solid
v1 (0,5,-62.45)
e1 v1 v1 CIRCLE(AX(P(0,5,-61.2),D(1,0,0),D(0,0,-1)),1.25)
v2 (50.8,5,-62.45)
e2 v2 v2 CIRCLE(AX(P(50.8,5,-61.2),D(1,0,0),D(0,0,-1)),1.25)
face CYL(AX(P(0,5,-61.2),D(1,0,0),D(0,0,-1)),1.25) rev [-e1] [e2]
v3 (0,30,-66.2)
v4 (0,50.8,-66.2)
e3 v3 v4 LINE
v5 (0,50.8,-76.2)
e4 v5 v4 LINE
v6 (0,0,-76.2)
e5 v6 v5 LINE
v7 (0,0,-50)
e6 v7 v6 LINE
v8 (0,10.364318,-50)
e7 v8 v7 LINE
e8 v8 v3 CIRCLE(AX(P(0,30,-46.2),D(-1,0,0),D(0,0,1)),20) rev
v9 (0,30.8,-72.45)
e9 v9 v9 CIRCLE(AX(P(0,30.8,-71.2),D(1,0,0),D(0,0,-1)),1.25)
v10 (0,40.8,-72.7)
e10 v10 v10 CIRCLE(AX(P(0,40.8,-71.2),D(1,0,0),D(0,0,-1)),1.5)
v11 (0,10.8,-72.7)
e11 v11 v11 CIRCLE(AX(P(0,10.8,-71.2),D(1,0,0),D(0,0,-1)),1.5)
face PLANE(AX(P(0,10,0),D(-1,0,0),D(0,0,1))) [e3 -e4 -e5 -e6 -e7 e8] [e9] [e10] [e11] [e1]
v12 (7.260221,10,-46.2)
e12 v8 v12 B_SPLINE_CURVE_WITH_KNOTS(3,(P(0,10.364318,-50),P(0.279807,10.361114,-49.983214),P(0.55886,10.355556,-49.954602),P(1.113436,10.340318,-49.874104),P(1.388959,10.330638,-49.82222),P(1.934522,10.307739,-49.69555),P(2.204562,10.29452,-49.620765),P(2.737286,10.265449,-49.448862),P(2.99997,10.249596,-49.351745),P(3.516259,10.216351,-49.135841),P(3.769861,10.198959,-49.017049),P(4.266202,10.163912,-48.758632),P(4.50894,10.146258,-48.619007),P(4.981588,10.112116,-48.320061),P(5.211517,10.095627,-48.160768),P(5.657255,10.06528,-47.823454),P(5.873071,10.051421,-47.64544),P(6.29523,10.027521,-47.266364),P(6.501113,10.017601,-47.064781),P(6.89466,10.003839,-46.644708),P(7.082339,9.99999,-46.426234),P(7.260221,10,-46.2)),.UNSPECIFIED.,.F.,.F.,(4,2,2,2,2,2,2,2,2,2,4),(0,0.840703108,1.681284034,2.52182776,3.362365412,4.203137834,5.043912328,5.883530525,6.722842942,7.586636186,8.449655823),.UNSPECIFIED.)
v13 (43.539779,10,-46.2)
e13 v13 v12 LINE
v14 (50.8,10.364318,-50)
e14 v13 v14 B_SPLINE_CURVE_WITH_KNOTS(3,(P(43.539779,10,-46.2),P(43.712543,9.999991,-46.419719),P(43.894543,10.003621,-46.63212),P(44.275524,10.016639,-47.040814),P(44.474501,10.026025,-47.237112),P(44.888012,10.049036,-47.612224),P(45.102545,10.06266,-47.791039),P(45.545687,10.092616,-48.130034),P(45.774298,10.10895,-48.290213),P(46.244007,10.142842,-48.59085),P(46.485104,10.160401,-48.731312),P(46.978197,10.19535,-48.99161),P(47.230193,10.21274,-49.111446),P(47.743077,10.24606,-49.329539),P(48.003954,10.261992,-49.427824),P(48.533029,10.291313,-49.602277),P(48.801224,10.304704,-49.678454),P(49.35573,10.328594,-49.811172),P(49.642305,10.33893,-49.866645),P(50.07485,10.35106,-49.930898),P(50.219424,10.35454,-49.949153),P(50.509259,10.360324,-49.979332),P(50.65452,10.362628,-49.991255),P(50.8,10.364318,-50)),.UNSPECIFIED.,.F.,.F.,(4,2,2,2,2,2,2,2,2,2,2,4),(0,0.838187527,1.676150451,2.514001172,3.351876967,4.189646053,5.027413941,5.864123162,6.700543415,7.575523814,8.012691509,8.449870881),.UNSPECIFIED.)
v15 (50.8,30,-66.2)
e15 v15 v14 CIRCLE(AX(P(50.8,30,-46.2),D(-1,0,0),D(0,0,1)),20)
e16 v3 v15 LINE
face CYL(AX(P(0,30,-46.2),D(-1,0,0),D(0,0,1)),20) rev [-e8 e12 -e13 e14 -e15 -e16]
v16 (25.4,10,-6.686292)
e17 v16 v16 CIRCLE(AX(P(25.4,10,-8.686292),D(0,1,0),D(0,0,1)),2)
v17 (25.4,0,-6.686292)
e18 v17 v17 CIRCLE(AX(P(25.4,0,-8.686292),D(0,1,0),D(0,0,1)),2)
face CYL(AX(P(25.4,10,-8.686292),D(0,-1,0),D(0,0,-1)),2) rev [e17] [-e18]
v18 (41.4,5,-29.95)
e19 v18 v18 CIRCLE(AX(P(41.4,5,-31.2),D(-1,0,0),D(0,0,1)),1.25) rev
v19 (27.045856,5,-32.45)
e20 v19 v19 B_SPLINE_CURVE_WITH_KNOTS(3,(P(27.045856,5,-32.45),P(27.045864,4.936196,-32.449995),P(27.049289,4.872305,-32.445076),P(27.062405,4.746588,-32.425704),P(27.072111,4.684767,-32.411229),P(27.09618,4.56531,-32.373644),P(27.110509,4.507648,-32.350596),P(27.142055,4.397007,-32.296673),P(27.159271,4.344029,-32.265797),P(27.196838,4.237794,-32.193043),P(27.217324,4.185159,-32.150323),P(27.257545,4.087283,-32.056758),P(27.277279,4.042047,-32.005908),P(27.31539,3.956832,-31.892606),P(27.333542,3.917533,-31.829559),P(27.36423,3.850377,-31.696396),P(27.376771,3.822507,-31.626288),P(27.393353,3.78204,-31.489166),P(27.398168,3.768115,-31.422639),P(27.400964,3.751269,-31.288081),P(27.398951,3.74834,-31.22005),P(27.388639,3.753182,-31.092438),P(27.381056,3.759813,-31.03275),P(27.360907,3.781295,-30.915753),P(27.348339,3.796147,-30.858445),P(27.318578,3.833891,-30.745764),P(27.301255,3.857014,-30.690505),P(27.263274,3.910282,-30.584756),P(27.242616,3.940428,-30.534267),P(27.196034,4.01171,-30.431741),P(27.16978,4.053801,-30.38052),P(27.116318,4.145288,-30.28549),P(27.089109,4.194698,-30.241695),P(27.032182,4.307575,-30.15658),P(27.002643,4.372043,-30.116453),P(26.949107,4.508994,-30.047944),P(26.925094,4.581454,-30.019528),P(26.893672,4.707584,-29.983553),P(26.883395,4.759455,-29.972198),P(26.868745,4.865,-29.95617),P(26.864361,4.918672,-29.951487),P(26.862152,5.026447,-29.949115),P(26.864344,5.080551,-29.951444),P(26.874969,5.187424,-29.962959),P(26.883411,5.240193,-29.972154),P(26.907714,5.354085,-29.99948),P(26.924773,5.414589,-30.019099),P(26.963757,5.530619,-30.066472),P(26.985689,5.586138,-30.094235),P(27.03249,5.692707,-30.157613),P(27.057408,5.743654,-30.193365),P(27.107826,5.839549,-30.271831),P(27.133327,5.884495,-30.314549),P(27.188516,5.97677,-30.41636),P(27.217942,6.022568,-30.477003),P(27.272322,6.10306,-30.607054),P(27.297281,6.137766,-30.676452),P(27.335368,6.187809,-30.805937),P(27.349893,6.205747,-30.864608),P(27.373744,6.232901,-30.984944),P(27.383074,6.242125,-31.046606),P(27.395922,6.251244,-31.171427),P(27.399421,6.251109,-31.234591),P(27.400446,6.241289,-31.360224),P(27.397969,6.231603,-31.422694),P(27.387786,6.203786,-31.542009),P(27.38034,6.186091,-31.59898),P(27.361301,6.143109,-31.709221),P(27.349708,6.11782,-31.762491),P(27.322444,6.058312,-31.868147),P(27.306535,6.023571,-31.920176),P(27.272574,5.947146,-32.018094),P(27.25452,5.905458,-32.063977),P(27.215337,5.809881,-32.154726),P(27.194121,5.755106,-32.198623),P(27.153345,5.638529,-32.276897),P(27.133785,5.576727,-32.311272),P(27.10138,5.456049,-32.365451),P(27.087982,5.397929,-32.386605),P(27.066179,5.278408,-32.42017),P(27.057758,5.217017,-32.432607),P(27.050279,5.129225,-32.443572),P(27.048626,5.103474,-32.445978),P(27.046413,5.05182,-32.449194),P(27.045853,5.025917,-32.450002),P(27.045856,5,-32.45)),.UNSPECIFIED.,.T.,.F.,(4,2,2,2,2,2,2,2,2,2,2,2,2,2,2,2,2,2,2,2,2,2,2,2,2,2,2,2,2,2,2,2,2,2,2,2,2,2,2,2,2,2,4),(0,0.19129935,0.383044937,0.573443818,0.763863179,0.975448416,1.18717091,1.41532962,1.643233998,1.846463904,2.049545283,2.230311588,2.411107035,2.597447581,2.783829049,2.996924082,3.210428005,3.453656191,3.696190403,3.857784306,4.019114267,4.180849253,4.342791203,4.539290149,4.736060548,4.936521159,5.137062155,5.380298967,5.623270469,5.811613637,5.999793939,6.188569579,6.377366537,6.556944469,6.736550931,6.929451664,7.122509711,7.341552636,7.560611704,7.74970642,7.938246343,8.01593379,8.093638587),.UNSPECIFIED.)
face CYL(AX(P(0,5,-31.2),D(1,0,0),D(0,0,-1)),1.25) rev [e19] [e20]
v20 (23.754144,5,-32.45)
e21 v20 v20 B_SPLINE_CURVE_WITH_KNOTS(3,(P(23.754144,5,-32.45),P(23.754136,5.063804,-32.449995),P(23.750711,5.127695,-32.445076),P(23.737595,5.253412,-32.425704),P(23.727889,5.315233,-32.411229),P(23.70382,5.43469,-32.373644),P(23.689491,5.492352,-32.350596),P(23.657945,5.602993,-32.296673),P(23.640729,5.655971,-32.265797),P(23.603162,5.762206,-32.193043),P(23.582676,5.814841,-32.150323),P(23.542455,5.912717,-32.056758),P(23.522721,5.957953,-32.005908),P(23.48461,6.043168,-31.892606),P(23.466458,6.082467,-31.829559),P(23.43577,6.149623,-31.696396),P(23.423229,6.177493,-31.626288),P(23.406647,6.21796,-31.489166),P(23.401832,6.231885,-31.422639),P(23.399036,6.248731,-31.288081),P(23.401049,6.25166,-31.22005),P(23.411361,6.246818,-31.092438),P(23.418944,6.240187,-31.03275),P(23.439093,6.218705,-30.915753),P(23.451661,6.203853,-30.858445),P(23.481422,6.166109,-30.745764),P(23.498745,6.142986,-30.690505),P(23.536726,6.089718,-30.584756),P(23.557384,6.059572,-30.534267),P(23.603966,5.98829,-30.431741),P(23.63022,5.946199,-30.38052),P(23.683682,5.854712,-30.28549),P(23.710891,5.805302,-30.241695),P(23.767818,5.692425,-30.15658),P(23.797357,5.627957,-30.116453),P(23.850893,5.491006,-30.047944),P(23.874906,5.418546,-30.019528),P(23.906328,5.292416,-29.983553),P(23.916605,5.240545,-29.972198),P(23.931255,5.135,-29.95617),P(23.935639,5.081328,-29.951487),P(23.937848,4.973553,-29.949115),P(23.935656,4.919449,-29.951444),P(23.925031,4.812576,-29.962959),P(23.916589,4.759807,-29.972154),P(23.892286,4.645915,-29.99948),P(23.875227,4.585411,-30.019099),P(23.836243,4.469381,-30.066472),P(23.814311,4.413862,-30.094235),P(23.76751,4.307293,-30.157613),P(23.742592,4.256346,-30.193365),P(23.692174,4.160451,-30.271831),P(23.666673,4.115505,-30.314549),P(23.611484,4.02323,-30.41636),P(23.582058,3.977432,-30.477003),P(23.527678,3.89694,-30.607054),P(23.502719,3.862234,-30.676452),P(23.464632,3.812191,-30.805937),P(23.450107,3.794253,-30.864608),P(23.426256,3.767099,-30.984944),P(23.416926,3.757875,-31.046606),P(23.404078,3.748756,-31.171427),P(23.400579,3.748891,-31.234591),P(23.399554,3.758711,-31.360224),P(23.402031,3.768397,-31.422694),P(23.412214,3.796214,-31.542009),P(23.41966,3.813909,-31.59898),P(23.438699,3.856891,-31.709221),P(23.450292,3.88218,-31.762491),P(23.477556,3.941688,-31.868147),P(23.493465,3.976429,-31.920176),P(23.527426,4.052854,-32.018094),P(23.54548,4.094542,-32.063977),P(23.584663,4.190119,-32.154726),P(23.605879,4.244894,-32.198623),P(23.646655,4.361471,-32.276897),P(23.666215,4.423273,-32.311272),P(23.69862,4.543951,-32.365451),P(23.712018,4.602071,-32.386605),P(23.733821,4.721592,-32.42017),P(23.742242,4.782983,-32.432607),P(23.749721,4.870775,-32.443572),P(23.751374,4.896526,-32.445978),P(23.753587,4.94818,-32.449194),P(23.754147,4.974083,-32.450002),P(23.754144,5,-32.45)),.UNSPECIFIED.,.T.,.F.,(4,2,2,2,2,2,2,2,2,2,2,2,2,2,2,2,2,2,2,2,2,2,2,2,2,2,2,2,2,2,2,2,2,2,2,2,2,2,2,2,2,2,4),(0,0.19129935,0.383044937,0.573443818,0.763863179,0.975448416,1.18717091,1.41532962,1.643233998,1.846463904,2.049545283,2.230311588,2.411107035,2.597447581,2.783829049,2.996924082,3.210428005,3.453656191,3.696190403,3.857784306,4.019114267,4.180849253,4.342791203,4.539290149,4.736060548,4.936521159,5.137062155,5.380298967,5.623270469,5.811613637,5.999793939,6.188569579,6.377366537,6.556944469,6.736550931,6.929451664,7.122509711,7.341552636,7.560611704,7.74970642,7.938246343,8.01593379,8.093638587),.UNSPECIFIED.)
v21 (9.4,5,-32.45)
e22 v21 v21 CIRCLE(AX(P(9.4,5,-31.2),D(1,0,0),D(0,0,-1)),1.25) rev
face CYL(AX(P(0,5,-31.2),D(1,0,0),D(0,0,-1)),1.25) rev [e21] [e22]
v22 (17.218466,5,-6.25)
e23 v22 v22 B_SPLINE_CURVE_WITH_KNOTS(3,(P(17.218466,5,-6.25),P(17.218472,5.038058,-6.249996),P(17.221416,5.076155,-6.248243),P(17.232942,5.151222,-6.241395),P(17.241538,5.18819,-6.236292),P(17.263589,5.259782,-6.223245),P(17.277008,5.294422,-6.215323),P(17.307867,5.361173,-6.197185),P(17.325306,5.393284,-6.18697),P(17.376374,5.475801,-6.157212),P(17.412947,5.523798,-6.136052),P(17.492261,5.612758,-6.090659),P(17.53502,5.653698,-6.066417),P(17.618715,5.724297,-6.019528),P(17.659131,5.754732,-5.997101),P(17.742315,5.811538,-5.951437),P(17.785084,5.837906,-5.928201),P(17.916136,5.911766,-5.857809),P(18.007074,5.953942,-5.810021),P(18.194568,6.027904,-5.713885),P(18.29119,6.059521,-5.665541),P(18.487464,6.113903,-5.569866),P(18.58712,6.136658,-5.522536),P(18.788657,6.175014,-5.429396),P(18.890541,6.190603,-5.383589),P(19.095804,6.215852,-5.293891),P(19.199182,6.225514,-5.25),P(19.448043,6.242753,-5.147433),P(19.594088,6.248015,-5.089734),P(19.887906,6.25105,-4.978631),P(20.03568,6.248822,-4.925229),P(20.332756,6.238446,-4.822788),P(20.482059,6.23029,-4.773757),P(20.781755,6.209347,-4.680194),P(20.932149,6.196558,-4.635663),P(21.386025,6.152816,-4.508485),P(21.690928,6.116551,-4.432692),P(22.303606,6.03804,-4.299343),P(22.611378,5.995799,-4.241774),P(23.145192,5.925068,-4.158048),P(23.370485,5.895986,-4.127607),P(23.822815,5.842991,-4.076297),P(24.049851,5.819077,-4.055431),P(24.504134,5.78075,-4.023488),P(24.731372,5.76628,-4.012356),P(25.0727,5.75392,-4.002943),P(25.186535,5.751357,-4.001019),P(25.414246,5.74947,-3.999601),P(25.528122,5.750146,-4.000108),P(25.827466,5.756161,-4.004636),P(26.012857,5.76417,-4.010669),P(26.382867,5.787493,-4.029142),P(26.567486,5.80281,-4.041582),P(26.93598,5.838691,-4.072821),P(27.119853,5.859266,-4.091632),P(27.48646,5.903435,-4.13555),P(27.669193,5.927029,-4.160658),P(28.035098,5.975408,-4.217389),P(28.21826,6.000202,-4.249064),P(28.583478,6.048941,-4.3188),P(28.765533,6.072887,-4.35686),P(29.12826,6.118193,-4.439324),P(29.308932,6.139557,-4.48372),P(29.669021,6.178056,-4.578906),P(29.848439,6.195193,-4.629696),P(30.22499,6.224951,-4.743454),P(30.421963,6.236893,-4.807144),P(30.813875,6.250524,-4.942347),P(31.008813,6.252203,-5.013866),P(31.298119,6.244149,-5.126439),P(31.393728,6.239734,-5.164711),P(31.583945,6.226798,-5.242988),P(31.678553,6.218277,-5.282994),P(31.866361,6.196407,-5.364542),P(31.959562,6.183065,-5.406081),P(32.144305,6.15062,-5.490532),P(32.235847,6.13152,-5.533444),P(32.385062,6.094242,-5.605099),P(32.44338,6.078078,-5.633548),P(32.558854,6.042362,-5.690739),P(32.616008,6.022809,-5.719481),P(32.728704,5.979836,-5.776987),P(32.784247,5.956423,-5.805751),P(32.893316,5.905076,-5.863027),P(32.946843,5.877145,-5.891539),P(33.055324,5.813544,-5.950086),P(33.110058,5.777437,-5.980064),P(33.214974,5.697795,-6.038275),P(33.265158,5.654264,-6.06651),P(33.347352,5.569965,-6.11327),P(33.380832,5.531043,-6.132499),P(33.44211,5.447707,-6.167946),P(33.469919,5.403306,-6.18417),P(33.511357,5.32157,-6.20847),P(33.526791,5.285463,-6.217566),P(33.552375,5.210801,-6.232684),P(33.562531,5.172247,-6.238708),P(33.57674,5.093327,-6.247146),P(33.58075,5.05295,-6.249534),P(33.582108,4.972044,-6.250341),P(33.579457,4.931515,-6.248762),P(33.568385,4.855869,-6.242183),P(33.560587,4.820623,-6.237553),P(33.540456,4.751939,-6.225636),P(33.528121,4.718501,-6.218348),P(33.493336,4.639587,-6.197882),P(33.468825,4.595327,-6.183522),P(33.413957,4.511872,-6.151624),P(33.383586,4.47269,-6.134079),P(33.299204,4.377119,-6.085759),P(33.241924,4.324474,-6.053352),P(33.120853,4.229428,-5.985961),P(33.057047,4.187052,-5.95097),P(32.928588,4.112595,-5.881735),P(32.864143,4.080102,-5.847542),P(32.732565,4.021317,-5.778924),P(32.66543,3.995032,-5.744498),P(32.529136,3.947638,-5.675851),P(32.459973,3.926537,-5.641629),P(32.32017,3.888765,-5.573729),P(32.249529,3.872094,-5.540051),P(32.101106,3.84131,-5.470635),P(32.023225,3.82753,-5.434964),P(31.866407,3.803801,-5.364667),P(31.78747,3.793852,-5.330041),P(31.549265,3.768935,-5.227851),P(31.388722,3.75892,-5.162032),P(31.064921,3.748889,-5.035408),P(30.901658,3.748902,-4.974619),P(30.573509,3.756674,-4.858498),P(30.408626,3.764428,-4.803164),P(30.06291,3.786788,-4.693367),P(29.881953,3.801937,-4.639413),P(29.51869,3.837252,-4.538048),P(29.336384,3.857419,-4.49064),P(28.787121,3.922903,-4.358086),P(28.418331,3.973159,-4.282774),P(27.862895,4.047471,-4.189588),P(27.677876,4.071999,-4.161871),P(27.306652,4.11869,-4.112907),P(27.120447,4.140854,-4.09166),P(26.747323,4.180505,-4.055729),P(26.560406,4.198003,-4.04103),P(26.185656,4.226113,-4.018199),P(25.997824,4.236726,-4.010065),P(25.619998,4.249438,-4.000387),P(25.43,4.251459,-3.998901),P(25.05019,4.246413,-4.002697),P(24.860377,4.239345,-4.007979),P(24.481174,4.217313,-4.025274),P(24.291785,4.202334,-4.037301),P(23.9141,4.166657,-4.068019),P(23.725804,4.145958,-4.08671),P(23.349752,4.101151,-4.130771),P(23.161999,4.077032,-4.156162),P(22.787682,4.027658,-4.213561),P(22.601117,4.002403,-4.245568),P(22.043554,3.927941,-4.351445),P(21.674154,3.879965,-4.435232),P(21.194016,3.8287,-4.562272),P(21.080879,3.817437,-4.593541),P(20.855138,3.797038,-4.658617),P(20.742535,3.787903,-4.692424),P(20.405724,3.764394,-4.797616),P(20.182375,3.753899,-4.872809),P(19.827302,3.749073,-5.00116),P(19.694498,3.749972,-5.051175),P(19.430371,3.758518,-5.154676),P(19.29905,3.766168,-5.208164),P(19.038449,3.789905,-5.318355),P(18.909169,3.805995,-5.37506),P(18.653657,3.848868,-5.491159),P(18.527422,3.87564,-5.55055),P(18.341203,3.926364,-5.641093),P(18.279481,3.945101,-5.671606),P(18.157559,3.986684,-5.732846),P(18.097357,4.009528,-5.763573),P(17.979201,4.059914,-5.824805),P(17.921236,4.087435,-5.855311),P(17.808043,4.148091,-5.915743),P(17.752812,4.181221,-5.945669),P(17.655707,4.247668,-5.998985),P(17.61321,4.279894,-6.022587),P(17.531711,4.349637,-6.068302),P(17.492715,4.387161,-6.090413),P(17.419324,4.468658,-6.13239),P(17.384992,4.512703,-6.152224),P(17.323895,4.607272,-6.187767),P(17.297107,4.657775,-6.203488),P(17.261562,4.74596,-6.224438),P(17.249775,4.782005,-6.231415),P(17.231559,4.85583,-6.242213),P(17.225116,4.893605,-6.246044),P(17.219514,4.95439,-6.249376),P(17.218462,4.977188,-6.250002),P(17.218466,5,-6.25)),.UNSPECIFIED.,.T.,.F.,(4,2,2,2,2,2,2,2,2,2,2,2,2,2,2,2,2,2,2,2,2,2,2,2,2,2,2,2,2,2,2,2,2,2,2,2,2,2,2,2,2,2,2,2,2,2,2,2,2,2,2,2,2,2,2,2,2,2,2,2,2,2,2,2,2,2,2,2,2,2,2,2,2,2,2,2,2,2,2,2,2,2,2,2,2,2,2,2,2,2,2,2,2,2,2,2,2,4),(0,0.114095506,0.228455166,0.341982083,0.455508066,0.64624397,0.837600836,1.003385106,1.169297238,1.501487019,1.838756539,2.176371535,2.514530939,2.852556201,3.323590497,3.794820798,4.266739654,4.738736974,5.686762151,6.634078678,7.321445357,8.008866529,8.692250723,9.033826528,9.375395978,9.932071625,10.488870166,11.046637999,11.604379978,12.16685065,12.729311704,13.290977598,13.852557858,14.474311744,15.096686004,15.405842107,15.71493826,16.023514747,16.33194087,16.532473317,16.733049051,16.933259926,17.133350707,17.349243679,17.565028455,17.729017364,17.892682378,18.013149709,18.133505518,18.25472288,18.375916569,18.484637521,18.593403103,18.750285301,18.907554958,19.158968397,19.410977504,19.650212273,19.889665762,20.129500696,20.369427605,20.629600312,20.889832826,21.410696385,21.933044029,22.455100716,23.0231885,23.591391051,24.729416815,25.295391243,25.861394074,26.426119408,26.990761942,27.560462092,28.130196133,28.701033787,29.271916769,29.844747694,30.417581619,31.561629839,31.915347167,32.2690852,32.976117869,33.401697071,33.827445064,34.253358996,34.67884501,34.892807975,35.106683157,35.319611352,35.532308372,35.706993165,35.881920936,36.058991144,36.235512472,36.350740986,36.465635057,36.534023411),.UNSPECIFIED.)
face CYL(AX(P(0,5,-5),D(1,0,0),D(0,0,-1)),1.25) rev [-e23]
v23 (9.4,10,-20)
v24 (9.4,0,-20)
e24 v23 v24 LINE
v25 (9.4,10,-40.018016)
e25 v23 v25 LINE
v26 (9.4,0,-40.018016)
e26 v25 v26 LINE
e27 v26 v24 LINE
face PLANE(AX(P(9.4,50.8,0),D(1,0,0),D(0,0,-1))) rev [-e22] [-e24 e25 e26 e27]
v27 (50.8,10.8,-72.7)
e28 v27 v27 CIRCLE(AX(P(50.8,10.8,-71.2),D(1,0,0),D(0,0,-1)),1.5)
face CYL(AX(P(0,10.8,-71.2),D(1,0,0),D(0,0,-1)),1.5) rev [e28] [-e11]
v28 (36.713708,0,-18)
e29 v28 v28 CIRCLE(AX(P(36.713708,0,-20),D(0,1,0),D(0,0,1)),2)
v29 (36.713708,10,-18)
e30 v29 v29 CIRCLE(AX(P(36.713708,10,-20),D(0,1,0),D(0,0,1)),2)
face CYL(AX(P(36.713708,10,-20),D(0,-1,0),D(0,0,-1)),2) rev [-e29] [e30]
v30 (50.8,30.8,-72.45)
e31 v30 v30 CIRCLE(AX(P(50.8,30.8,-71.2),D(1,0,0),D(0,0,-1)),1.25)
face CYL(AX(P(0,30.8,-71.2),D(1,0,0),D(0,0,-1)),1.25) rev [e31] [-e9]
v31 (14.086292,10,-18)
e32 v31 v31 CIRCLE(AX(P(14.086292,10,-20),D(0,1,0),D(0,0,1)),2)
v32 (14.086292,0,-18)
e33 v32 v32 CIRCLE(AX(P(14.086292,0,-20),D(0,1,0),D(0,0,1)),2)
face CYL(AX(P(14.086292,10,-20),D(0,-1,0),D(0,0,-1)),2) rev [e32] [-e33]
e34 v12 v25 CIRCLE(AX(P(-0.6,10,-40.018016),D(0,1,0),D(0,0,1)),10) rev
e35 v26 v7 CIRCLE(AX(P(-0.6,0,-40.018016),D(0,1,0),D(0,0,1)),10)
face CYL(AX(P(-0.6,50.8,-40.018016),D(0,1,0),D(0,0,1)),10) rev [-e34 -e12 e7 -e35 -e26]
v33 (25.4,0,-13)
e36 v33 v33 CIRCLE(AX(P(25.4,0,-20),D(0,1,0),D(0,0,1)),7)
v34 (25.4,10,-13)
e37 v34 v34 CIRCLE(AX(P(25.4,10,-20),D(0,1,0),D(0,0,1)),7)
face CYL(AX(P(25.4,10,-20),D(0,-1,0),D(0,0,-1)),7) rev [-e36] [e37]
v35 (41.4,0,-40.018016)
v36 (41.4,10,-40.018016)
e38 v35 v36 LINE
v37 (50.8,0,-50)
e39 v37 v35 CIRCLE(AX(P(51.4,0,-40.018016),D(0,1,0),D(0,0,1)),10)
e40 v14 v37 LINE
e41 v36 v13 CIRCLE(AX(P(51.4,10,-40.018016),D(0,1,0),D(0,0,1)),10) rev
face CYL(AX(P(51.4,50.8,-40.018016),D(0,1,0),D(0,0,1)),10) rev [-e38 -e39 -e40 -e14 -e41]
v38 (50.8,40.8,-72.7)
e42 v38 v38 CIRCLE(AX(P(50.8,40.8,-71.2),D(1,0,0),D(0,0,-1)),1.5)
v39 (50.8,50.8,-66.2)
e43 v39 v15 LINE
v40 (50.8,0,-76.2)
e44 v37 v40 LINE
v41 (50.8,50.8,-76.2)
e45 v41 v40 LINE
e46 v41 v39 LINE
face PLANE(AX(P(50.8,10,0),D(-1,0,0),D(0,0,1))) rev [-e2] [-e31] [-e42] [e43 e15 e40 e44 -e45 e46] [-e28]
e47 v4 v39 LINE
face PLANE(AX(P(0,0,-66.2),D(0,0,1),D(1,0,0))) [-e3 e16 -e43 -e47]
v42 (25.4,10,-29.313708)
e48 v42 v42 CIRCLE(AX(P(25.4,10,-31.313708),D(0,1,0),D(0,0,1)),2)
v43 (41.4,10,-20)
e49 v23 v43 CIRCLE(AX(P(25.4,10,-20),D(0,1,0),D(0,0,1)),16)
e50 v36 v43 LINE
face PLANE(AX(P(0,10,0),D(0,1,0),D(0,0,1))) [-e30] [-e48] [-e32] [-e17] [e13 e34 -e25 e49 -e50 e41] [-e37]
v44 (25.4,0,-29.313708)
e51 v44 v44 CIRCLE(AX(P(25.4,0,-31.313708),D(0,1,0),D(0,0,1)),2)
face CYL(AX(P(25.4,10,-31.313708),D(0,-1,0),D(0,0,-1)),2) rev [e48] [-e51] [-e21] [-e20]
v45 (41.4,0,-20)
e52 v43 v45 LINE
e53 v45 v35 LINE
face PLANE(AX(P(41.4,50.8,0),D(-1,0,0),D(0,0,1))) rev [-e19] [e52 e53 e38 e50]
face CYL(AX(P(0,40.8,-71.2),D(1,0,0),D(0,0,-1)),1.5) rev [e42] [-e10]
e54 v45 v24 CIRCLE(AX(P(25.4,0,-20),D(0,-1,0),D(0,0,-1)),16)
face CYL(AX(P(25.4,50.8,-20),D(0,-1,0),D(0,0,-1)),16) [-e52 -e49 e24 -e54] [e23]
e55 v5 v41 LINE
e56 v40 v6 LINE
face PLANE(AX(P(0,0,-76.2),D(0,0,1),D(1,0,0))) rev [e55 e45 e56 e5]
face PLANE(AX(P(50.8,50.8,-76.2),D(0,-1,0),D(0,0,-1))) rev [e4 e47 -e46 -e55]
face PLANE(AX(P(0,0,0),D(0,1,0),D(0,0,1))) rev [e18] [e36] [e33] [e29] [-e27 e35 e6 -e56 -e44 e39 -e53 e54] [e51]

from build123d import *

# Parameters (mm, degrees)
SKETCH1_W           = 50.8
SKETCH1_H           = 66.2
SKETCH1_R           = 2
SKETCH1_R_2         = 7
BOSS_EXTRUDE1_DEPTH = 10
SKETCH2_W           = 50.8
SKETCH2_H           = 50.8
BOSS_EXTRUDE2_DEPTH = 10
FILLET2_R           = 20
SKETCH3_R           = 1.25
CUT_EXTRUDE1_DEPTH  = 105.726882891
SKETCH4_R           = 1.25
SKETCH4_R_2         = 1.5
CUT_EXTRUDE2_DEPTH  = 105.726882939
CUT_EXTRUDE3_DEPTH  = 105.726882939
FILLET3_DEPTH       = 10.364318194
FILLET3_START       = -1
FILLET3_2_DEPTH     = 53


with BuildPart() as part:
    # Sketch1 → Boss-Extrude1 (new body)
    with BuildSketch(Plane(origin=(0, 0, 0), x_dir=(1, 0, 0), z_dir=(0, 1, 0))):
        with Locations((25.4, 33.1)):
            Rectangle(SKETCH1_W, SKETCH1_H)
        with Locations(Location((14.086291501, 20, 0), (0, 0, 270))):
            Circle(SKETCH1_R, mode=Mode.SUBTRACT)
        with Locations(Location((25.4, 8.686291501, 0), (0, 0, 270))):
            Circle(SKETCH1_R, mode=Mode.SUBTRACT)
        with Locations(Location((36.713708499, 20, 0), (0, 0, 270))):
            Circle(SKETCH1_R, mode=Mode.SUBTRACT)
        with Locations(Location((25.4, 31.313708499, 0), (0, 0, 270))):
            Circle(SKETCH1_R, mode=Mode.SUBTRACT)
        with Locations(Location((25.4, 20, 0), (0, 0, 270))):
            Circle(SKETCH1_R_2, mode=Mode.SUBTRACT)
    extrude(amount=BOSS_EXTRUDE1_DEPTH)

    # Sketch2 → Boss-Extrude2 (add)
    with BuildSketch(Plane(origin=(0, 0, -66.2), x_dir=(-1, 0, 0), z_dir=(0, 0, -1))):
        with Locations((-25.4, 25.4)):
            Rectangle(SKETCH2_W, SKETCH2_H)
    extrude(amount=BOSS_EXTRUDE2_DEPTH)

    # Fillet2
    fillet2_edges = [part.edges().sort_by_distance(p)[0] for p in [
        (25.4, 10, -66.2),
    ]]
    fillet(fillet2_edges, radius=FILLET2_R)

    # Sketch3 → Cut-Extrude1 (cut, through all)
    with BuildSketch(Plane(origin=(50.8, 0, 0), x_dir=(0, 0, -1), z_dir=(1, 0, 0))):
        with Locations((61.2, 5)):
            Circle(SKETCH3_R)
        with Locations((31.2, 5)):
            Circle(SKETCH3_R)
        with Locations((5, 5)):
            Circle(SKETCH3_R)
    extrude(amount=-CUT_EXTRUDE1_DEPTH, mode=Mode.SUBTRACT)

    # Sketch4 → Cut-Extrude2 (cut, through all)
    with BuildSketch(Plane(origin=(50.8, 0, 0), x_dir=(0, 0, -1), z_dir=(1, 0, 0))):
        with Locations((71.2, -9.2)):
            Circle(SKETCH4_R)
        with Locations((71.2, 30.8)):
            Circle(SKETCH4_R)
        with Locations((71.2, 10.8)):
            Circle(SKETCH4_R_2)
        with Locations((71.2, 40.8)):
            Circle(SKETCH4_R_2)
    extrude(amount=-CUT_EXTRUDE2_DEPTH, mode=Mode.SUBTRACT)

    # Sketch5 → Cut-Extrude3 (cut, through all)
    with BuildSketch(Plane(origin=(0, 0, 0), x_dir=(-1, 0, 0), z_dir=(0, -1, 0))):
        with BuildLine():
            ThreePointArc((-25.4, 4), (-36.713708499, 8.686291501), (-41.4, 20))
            Line((-41.4, 20), (-41.4, 50))
            Line((-41.4, 50), (-50.8, 50))
            Line((-50.8, 50), (-50.8, 0))
            Line((-50.8, 0), (0, 0))
            Line((0, 0), (0, 50))
            Line((0, 50), (-9.4, 50))
            Line((-9.4, 50), (-9.4, 20))
            ThreePointArc((-9.4, 20), (-14.086291501, 8.686291501), (-25.4, 4))
        make_face()
    extrude(amount=-CUT_EXTRUDE3_DEPTH, mode=Mode.SUBTRACT)

    # Fillet3: read off the stored shape, not the designer's step
    # Fillet3 outline → Fillet3 (add)
    with BuildSketch(Plane(origin=(0, 0, 0), x_dir=(1, 0, 0), z_dir=(0, 1, 0))):
        with BuildLine():
            ThreePointArc((0, 50), (6.680109889, 46.87367083), (9.4, 40.018016229))
            Line((9.4, 40.018016229), (9.4, 50))
            Line((9.4, 50), (0, 50))
        make_face()
        with BuildLine():
            ThreePointArc((41.4, 40.018016229), (44.119890111, 46.87367083), (50.8, 50))
            Line((50.8, 50), (41.4, 50))
            Line((41.4, 50), (41.4, 40.018016229))
        make_face()
    extrude(amount=FILLET3_DEPTH)

    # Fillet3 2 outline → Fillet3 2 (cut)
    with BuildSketch(Plane.YZ.offset(FILLET3_START)):
        with BuildLine():
            ThreePointArc((10, -46.2), (10.091287885, -48.108712115), (10.364318194, -50))
            ThreePointArc((10.364318194, -50), (10.586120766, -51.006380458), (10.859467092, -52))
            Line((10.859467092, -52), (12, -52))
            Line((12, -52), (12, -39))
            Line((12, -39), (10, -39))
            Line((10, -39), (10, -46.2))
        make_face()
    extrude(amount=FILLET3_2_DEPTH, mode=Mode.SUBTRACT)


solid = part.part
